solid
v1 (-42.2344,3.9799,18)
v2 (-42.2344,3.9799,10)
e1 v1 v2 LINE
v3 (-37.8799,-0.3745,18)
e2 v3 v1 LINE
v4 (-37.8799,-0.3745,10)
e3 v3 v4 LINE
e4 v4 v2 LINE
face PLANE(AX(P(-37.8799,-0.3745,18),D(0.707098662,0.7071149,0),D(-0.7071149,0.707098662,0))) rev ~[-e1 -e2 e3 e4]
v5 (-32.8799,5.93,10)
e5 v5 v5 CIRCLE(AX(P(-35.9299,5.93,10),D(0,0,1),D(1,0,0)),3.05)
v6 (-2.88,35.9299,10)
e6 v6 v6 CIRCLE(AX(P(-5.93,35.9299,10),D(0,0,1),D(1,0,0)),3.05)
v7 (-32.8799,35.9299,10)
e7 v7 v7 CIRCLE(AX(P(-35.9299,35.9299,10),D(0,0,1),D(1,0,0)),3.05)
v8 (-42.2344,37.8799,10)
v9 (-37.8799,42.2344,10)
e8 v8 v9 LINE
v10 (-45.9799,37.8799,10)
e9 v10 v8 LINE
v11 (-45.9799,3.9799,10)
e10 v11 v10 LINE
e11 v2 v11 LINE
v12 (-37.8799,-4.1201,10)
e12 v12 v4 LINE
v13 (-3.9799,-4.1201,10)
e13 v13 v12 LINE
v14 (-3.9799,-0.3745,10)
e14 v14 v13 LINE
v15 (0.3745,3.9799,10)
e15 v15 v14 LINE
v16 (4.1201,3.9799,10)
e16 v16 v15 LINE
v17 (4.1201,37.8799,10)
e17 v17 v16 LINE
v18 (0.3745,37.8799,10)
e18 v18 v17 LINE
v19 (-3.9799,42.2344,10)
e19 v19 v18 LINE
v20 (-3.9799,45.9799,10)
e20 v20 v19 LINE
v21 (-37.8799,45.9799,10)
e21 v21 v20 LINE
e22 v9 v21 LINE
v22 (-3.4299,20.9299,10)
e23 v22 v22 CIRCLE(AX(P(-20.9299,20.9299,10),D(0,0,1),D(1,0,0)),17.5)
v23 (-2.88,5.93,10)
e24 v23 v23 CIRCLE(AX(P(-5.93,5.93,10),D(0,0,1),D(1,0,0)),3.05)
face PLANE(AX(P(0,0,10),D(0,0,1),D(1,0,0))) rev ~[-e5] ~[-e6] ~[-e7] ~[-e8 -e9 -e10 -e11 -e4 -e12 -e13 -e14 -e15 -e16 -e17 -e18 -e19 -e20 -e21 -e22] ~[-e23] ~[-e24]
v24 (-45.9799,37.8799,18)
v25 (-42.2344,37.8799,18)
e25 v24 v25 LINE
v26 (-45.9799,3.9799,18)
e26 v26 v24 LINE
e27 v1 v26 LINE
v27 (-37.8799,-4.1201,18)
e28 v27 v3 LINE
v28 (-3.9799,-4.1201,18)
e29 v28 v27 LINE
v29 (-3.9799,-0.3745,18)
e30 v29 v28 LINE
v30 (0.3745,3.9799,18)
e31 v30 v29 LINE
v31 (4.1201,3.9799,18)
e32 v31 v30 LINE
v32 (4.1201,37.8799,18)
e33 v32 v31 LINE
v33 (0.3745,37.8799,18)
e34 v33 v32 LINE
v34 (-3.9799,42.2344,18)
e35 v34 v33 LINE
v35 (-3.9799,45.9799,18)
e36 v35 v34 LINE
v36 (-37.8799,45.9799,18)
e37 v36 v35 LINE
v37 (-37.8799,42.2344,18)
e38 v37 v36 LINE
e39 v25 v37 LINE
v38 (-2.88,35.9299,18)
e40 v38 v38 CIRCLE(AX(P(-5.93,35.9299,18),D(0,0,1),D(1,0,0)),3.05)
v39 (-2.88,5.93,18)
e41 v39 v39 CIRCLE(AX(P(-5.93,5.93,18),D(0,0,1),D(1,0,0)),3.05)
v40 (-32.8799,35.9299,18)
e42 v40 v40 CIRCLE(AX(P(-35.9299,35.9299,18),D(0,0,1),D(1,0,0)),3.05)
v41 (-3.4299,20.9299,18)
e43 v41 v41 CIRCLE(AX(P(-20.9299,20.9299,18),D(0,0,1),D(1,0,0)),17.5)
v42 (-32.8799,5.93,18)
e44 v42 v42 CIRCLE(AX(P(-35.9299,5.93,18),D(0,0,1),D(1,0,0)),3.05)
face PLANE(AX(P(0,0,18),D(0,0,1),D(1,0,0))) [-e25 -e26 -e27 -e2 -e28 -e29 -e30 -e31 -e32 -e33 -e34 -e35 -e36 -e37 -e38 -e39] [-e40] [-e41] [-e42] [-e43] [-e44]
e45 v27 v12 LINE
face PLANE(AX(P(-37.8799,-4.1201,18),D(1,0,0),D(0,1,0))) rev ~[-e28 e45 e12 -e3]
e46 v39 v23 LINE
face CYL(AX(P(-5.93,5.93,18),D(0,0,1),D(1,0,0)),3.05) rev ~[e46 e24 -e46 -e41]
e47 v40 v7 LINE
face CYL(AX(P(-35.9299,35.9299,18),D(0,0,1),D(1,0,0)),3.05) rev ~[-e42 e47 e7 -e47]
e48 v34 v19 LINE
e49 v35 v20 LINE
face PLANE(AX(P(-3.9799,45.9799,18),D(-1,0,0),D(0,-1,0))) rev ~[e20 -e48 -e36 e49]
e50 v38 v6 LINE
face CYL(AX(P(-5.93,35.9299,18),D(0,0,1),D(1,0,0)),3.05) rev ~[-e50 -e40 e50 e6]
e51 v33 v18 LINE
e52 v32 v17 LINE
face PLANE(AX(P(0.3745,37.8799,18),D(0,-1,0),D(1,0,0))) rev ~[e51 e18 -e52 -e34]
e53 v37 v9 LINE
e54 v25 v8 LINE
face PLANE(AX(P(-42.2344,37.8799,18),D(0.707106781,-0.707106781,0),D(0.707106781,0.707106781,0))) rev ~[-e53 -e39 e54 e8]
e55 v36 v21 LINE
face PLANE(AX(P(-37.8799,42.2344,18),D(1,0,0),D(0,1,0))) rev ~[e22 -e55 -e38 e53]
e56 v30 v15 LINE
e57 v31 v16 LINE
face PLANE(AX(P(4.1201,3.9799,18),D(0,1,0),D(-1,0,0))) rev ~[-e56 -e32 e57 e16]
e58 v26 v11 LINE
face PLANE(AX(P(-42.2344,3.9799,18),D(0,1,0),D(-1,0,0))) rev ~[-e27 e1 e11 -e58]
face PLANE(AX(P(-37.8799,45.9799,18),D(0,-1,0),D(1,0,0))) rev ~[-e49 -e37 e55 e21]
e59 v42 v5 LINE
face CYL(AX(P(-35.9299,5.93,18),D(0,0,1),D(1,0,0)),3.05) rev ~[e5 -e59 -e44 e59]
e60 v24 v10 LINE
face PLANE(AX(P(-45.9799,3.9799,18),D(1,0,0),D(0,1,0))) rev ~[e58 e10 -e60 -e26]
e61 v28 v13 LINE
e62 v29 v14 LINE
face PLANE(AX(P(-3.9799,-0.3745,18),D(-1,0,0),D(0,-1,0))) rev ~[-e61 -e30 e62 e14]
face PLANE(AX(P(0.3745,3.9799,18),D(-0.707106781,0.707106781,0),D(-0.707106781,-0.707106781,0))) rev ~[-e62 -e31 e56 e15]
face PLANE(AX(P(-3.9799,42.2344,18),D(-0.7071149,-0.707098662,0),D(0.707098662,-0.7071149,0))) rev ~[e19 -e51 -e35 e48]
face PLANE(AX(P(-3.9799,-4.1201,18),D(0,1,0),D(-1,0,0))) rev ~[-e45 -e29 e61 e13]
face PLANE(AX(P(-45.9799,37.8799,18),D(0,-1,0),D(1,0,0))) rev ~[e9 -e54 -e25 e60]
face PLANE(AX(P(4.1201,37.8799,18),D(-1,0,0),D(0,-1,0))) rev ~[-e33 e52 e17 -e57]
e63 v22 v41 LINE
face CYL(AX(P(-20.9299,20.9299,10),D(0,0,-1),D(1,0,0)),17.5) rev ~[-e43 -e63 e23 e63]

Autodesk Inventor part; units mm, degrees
ref_plane "YZ Plane" through (0, 0, 0) normal (1, 0, 0) x (0, 1, 0)
ref_plane "XZ Plane" through (0, 0, 0) normal (0, 1, 0) x (-1, 0, 0)
ref_plane "Work Plane1" through (0, 0, 10) normal (0, 0, 1) x (1, 0, 0)
sketch "Sketch1" plane through (0, 0, 10) normal (0, 0, 1) x (1, 0, 0)
  line L0 (-4.0299, -0.3538) -> (-2.2322, 1.4439) construction
  arc A0 (-1.4439, 2.2322) -> (-2.2322, 1.4439) centre (-0.9299, 0.9299) ccw construction
  line L1 (-1.4439, 2.2322) -> (0.3538, 4.0299) construction
  line L2 (-37.8299, 42.8299) -> (-37.8299, 37.8299) construction
  line L3 (-37.8299, 37.8299) -> (-42.9208, 37.8299) construction
  line L4 (-37.8299, 42.2137) -> (-37.8299, 45.8299) construction
  line L5 (-37.8299, 45.8299) -> (-4.0299, 45.8299) construction
  line L6 (-4.0299, 45.8299) -> (-4.0299, 42.2137) construction
  line L7 (-4.0299, 4.0299) -> (0.3538, 4.0299) projected
  circle A1 centre (-20.9299, 20.9299) radius 17.5 projected
  line L8 (-20.9299, 58.9723) -> (17.1124, 20.9299) construction
  line L9 (17.1124, 20.9299) -> (-20.9299, -17.1124) construction
  line L10 (-20.9299, -17.1124) -> (-58.9723, 20.9299) construction
  line L11 (-58.9723, 20.9299) -> (-20.9299, 58.9723) construction
  line L12 (-20.9299, 58.9723) -> (-20.9299, -17.1124) construction
  line L13 (17.1124, 20.9299) -> (-58.9723, 20.9299) construction
  line L14 (-20.9299, 58.9723) -> (32.8701, 58.9723) construction
  line L15 (-43.4299, 43.4299) -> (1.5701, 43.4299) construction
  line L16 (1.5701, 43.4299) -> (1.5701, -1.5701) construction
  line L17 (1.5701, -1.5701) -> (-43.4299, -1.5701) construction
  line L18 (-43.4299, -1.5701) -> (-43.4299, 43.4299) construction
  line L19 (-43.4299, 43.4299) -> (1.5701, -1.5701) construction
  line L20 (1.5701, 43.4299) -> (-43.4299, -1.5701) construction
  line L21 (-43.4299, 5.3876) -> (-43.4299, 36.4723)
  line L22 (-43.4299, 36.4723) -> (-36.4723, 43.4299)
  line L23 (-36.4723, 43.4299) -> (-5.3876, 43.4299)
  line L24 (-5.3876, 43.4299) -> (1.5701, 36.4723)
  line L25 (1.5701, 36.4723) -> (1.5701, 5.3876)
  line L26 (1.5701, 5.3876) -> (-5.3876, -1.5701)
  line L27 (-5.3876, -1.5701) -> (-36.4723, -1.5701)
  line L28 (-36.4723, -1.5701) -> (-43.4299, 5.3876)
  line L29 (-4.0299, 42.2137) -> (-37.8299, 42.2137) projected
  line L30 (-4.0299, -0.3538) -> (-4.0299, 4.0299) projected
  point P0 (-37.8299, 4.0299)
  point P1 (-20.9299, 20.9299)
  dimension "d18" = 53.8
  dimension "d19" = 45
  dimension "d20" = 53.8
  dimension "d21" = 45
  dimension "d22" = 45
extrude "Extrusion1" add sketch "Sketch1" along normal blind 8
sketch "Sketch2" plane through (0, 0, 18) normal (0, 0, 1) x (1, 0, 0)
  circle A0 centre (-35.9299, 35.9299) radius 3.0099 construction
  circle A1 centre (-5.93, 35.9299) radius 3.0099 construction
  circle A2 centre (-5.93, 5.93) radius 3.0099 construction
  circle A3 centre (-35.9299, 5.93) radius 3.0099 construction
  circle A4 centre (-35.9299, 35.9299) radius 3.05
  circle A5 centre (-5.93, 35.9299) radius 3.05
  circle A6 centre (-5.93, 5.93) radius 3.05
  circle A7 centre (-35.9299, 5.93) radius 3.05
  point P0 (0, 0)
  dimension "d30" = 6.1
  dimension "d31" = 6.1
  dimension "d32" = 6.1
  dimension "d33" = 6.1
ref_plane "Work Plane2" through (-40.9959, 0.8639, 22.2359) normal (0, 0, 1) x (1, 0, 0)
extrude "Extrusion2" cut sketch "Sketch2" against normal through all
sketch "Sketch3" plane through (0, 0, 10) normal (0, 0, -1) x (-1, 0, 0)
  line L0 (37.8299, -0.4701) -> (37.8299, 4.0299) construction
  line L1 (4.0299, 4.0299) -> (4.0299, -0.4701) construction
  line L2 (37.8299, -0.4701) -> (37.8299, 1.1886) construction
  line L3 (4.0299, -3.9701) -> (4.0299, -0.3538) construction
  line L4 (45.8299, 4.0299) -> (42.2137, 4.0299) construction
  line L5 (-0.3538, 4.0299) -> (-3.9701, 4.0299) construction
  line L6 (-3.9701, 37.8299) -> (-0.3538, 37.8299) construction
  line L7 (4.0299, 42.2137) -> (4.0299, 45.8299) construction
  line L8 (37.8299, 45.8299) -> (37.8299, 42.2137) construction
  line L9 (42.2137, 37.8299) -> (45.8299, 37.8299) construction
  line L10 (40.4657, 37.7299) -> (45.8299, 37.7299)
  line L11 (45.8299, 37.7299) -> (45.8299, 4.1299)
  line L12 (45.8299, 4.1299) -> (40.4657, 4.1299)
  line L13 (40.4657, 4.1299) -> (40.4657, 37.7299)
  line L14 (37.7299, 2.4952) -> (4.1299, 2.4952)
  line L15 (4.1299, 2.4952) -> (4.1299, -3.9701)
  line L16 (4.1299, -3.9701) -> (37.7299, -3.9701)
  line L17 (37.7299, -3.9701) -> (37.7299, 2.4952)
  line L18 (1.8946, 4.1299) -> (-3.9701, 4.1299)
  line L19 (-3.9701, 4.1299) -> (-3.9701, 37.7299)
  line L20 (-3.9701, 37.7299) -> (1.8946, 37.7299)
  line L21 (1.8946, 37.7299) -> (1.8946, 4.1299)
  line L22 (4.1299, 40.7326) -> (37.7299, 40.7326)
  line L23 (37.7299, 40.7326) -> (37.7299, 45.8299)
  line L24 (37.7299, 45.8299) -> (4.1299, 45.8299)
  line L25 (4.1299, 45.8299) -> (4.1299, 40.7326)
  point P0 (0, 0)
  dimension "d23" = 0.1
  dimension "d24" = 0.1
  dimension "d25" = 0.1
  dimension "d26" = 0.1
  dimension "d27" = 0.1
extrude "Extrusion3" add sketch "Sketch3" against normal up to surface (8 mm away)
sketch "Sketch4" plane through (0, 0, 18) normal (0, 0, 1) x (1, 0, 0)
  line L0 (3.9701, 4.1299) -> (0.3124, 4.1299) projected
  line L1 (3.9701, 37.7299) -> (3.9701, 4.1299) projected
  line L2 (0.3124, 37.7299) -> (3.9701, 37.7299) projected
  line L3 (0.3124, 37.7299) -> (-4.1299, 42.1723) projected
  line L4 (-4.1299, 45.8299) -> (-4.1299, 42.1723) projected
  line L5 (-37.7299, 45.8299) -> (-4.1299, 45.8299) projected
  line L6 (-37.7299, 42.1723) -> (-37.7299, 45.8299) projected
  line L7 (-37.7299, 42.1723) -> (-42.1723, 37.7299) projected
  line L8 (-45.8299, 37.7299) -> (-42.1723, 37.7299) projected
  line L9 (-45.8299, 4.1299) -> (-45.8299, 37.7299) projected
  line L10 (-42.1723, 4.1299) -> (-45.8299, 4.1299) projected
  line L11 (-42.1723, 4.1299) -> (-37.7299, -0.3124) projected
  line L12 (-37.7299, -3.9701) -> (-37.7299, -0.3124) projected
  line L13 (-4.1299, -3.9701) -> (-37.7299, -3.9701) projected
  line L14 (-4.1299, -0.3124) -> (-4.1299, -3.9701) projected
  line L15 (-4.1299, -0.3124) -> (0.3124, 4.1299) projected
  circle A0 centre (-20.9299, 20.9299) radius 17.5 projected
  circle A1 centre (-35.9299, 5.93) radius 3.05 projected
  circle A2 centre (-5.93, 35.9299) radius 3.05 projected
  circle A3 centre (-35.9299, 35.9299) radius 3.05 projected
  circle A4 centre (-5.93, 5.93) radius 3.05 projected
  line L16 (-3.9799, 45.9799) -> (-3.9799, 42.2344)
  line L17 (-3.9799, 42.2344) -> (0.3745, 37.8799)
  line L18 (0.3745, 37.8799) -> (4.1201, 37.8799)
  line L19 (4.1201, 37.8799) -> (4.1201, 3.9799)
  line L20 (4.1201, 3.9799) -> (0.3745, 3.9799)
  line L21 (0.3745, 3.9799) -> (-3.9799, -0.3745)
  line L22 (-3.9799, -0.3745) -> (-3.9799, -4.1201)
  line L23 (-3.9799, -4.1201) -> (-37.8799, -4.1201)
  line L24 (-37.8799, -4.1201) -> (-37.8799, -0.3745)
  line L25 (-37.8799, -0.3745) -> (-42.2344, 3.9799)
  line L26 (-42.2344, 3.9799) -> (-45.9799, 3.9799)
  line L27 (-45.9799, 3.9799) -> (-45.9799, 37.8799)
  line L28 (-45.9799, 37.8799) -> (-42.2344, 37.8799)
  line L29 (-42.2344, 37.8799) -> (-37.8799, 42.2344)
  line L30 (-37.8799, 42.2344) -> (-37.8799, 45.9799)
  line L31 (-37.8799, 45.9799) -> (-3.9799, 45.9799)
  point P0 (0, 0)
  dimension "d34" = 0.15
extrude "Extrusion4" add sketch "Sketch4" against normal up to surface (8 mm away) contours L16 L17 L18 L19 L20 L21 L22 L23 L24 L25 L26 L27 L28 L29 L30 L31
properties part number "50_Cube_Insert_Thorlabs"
